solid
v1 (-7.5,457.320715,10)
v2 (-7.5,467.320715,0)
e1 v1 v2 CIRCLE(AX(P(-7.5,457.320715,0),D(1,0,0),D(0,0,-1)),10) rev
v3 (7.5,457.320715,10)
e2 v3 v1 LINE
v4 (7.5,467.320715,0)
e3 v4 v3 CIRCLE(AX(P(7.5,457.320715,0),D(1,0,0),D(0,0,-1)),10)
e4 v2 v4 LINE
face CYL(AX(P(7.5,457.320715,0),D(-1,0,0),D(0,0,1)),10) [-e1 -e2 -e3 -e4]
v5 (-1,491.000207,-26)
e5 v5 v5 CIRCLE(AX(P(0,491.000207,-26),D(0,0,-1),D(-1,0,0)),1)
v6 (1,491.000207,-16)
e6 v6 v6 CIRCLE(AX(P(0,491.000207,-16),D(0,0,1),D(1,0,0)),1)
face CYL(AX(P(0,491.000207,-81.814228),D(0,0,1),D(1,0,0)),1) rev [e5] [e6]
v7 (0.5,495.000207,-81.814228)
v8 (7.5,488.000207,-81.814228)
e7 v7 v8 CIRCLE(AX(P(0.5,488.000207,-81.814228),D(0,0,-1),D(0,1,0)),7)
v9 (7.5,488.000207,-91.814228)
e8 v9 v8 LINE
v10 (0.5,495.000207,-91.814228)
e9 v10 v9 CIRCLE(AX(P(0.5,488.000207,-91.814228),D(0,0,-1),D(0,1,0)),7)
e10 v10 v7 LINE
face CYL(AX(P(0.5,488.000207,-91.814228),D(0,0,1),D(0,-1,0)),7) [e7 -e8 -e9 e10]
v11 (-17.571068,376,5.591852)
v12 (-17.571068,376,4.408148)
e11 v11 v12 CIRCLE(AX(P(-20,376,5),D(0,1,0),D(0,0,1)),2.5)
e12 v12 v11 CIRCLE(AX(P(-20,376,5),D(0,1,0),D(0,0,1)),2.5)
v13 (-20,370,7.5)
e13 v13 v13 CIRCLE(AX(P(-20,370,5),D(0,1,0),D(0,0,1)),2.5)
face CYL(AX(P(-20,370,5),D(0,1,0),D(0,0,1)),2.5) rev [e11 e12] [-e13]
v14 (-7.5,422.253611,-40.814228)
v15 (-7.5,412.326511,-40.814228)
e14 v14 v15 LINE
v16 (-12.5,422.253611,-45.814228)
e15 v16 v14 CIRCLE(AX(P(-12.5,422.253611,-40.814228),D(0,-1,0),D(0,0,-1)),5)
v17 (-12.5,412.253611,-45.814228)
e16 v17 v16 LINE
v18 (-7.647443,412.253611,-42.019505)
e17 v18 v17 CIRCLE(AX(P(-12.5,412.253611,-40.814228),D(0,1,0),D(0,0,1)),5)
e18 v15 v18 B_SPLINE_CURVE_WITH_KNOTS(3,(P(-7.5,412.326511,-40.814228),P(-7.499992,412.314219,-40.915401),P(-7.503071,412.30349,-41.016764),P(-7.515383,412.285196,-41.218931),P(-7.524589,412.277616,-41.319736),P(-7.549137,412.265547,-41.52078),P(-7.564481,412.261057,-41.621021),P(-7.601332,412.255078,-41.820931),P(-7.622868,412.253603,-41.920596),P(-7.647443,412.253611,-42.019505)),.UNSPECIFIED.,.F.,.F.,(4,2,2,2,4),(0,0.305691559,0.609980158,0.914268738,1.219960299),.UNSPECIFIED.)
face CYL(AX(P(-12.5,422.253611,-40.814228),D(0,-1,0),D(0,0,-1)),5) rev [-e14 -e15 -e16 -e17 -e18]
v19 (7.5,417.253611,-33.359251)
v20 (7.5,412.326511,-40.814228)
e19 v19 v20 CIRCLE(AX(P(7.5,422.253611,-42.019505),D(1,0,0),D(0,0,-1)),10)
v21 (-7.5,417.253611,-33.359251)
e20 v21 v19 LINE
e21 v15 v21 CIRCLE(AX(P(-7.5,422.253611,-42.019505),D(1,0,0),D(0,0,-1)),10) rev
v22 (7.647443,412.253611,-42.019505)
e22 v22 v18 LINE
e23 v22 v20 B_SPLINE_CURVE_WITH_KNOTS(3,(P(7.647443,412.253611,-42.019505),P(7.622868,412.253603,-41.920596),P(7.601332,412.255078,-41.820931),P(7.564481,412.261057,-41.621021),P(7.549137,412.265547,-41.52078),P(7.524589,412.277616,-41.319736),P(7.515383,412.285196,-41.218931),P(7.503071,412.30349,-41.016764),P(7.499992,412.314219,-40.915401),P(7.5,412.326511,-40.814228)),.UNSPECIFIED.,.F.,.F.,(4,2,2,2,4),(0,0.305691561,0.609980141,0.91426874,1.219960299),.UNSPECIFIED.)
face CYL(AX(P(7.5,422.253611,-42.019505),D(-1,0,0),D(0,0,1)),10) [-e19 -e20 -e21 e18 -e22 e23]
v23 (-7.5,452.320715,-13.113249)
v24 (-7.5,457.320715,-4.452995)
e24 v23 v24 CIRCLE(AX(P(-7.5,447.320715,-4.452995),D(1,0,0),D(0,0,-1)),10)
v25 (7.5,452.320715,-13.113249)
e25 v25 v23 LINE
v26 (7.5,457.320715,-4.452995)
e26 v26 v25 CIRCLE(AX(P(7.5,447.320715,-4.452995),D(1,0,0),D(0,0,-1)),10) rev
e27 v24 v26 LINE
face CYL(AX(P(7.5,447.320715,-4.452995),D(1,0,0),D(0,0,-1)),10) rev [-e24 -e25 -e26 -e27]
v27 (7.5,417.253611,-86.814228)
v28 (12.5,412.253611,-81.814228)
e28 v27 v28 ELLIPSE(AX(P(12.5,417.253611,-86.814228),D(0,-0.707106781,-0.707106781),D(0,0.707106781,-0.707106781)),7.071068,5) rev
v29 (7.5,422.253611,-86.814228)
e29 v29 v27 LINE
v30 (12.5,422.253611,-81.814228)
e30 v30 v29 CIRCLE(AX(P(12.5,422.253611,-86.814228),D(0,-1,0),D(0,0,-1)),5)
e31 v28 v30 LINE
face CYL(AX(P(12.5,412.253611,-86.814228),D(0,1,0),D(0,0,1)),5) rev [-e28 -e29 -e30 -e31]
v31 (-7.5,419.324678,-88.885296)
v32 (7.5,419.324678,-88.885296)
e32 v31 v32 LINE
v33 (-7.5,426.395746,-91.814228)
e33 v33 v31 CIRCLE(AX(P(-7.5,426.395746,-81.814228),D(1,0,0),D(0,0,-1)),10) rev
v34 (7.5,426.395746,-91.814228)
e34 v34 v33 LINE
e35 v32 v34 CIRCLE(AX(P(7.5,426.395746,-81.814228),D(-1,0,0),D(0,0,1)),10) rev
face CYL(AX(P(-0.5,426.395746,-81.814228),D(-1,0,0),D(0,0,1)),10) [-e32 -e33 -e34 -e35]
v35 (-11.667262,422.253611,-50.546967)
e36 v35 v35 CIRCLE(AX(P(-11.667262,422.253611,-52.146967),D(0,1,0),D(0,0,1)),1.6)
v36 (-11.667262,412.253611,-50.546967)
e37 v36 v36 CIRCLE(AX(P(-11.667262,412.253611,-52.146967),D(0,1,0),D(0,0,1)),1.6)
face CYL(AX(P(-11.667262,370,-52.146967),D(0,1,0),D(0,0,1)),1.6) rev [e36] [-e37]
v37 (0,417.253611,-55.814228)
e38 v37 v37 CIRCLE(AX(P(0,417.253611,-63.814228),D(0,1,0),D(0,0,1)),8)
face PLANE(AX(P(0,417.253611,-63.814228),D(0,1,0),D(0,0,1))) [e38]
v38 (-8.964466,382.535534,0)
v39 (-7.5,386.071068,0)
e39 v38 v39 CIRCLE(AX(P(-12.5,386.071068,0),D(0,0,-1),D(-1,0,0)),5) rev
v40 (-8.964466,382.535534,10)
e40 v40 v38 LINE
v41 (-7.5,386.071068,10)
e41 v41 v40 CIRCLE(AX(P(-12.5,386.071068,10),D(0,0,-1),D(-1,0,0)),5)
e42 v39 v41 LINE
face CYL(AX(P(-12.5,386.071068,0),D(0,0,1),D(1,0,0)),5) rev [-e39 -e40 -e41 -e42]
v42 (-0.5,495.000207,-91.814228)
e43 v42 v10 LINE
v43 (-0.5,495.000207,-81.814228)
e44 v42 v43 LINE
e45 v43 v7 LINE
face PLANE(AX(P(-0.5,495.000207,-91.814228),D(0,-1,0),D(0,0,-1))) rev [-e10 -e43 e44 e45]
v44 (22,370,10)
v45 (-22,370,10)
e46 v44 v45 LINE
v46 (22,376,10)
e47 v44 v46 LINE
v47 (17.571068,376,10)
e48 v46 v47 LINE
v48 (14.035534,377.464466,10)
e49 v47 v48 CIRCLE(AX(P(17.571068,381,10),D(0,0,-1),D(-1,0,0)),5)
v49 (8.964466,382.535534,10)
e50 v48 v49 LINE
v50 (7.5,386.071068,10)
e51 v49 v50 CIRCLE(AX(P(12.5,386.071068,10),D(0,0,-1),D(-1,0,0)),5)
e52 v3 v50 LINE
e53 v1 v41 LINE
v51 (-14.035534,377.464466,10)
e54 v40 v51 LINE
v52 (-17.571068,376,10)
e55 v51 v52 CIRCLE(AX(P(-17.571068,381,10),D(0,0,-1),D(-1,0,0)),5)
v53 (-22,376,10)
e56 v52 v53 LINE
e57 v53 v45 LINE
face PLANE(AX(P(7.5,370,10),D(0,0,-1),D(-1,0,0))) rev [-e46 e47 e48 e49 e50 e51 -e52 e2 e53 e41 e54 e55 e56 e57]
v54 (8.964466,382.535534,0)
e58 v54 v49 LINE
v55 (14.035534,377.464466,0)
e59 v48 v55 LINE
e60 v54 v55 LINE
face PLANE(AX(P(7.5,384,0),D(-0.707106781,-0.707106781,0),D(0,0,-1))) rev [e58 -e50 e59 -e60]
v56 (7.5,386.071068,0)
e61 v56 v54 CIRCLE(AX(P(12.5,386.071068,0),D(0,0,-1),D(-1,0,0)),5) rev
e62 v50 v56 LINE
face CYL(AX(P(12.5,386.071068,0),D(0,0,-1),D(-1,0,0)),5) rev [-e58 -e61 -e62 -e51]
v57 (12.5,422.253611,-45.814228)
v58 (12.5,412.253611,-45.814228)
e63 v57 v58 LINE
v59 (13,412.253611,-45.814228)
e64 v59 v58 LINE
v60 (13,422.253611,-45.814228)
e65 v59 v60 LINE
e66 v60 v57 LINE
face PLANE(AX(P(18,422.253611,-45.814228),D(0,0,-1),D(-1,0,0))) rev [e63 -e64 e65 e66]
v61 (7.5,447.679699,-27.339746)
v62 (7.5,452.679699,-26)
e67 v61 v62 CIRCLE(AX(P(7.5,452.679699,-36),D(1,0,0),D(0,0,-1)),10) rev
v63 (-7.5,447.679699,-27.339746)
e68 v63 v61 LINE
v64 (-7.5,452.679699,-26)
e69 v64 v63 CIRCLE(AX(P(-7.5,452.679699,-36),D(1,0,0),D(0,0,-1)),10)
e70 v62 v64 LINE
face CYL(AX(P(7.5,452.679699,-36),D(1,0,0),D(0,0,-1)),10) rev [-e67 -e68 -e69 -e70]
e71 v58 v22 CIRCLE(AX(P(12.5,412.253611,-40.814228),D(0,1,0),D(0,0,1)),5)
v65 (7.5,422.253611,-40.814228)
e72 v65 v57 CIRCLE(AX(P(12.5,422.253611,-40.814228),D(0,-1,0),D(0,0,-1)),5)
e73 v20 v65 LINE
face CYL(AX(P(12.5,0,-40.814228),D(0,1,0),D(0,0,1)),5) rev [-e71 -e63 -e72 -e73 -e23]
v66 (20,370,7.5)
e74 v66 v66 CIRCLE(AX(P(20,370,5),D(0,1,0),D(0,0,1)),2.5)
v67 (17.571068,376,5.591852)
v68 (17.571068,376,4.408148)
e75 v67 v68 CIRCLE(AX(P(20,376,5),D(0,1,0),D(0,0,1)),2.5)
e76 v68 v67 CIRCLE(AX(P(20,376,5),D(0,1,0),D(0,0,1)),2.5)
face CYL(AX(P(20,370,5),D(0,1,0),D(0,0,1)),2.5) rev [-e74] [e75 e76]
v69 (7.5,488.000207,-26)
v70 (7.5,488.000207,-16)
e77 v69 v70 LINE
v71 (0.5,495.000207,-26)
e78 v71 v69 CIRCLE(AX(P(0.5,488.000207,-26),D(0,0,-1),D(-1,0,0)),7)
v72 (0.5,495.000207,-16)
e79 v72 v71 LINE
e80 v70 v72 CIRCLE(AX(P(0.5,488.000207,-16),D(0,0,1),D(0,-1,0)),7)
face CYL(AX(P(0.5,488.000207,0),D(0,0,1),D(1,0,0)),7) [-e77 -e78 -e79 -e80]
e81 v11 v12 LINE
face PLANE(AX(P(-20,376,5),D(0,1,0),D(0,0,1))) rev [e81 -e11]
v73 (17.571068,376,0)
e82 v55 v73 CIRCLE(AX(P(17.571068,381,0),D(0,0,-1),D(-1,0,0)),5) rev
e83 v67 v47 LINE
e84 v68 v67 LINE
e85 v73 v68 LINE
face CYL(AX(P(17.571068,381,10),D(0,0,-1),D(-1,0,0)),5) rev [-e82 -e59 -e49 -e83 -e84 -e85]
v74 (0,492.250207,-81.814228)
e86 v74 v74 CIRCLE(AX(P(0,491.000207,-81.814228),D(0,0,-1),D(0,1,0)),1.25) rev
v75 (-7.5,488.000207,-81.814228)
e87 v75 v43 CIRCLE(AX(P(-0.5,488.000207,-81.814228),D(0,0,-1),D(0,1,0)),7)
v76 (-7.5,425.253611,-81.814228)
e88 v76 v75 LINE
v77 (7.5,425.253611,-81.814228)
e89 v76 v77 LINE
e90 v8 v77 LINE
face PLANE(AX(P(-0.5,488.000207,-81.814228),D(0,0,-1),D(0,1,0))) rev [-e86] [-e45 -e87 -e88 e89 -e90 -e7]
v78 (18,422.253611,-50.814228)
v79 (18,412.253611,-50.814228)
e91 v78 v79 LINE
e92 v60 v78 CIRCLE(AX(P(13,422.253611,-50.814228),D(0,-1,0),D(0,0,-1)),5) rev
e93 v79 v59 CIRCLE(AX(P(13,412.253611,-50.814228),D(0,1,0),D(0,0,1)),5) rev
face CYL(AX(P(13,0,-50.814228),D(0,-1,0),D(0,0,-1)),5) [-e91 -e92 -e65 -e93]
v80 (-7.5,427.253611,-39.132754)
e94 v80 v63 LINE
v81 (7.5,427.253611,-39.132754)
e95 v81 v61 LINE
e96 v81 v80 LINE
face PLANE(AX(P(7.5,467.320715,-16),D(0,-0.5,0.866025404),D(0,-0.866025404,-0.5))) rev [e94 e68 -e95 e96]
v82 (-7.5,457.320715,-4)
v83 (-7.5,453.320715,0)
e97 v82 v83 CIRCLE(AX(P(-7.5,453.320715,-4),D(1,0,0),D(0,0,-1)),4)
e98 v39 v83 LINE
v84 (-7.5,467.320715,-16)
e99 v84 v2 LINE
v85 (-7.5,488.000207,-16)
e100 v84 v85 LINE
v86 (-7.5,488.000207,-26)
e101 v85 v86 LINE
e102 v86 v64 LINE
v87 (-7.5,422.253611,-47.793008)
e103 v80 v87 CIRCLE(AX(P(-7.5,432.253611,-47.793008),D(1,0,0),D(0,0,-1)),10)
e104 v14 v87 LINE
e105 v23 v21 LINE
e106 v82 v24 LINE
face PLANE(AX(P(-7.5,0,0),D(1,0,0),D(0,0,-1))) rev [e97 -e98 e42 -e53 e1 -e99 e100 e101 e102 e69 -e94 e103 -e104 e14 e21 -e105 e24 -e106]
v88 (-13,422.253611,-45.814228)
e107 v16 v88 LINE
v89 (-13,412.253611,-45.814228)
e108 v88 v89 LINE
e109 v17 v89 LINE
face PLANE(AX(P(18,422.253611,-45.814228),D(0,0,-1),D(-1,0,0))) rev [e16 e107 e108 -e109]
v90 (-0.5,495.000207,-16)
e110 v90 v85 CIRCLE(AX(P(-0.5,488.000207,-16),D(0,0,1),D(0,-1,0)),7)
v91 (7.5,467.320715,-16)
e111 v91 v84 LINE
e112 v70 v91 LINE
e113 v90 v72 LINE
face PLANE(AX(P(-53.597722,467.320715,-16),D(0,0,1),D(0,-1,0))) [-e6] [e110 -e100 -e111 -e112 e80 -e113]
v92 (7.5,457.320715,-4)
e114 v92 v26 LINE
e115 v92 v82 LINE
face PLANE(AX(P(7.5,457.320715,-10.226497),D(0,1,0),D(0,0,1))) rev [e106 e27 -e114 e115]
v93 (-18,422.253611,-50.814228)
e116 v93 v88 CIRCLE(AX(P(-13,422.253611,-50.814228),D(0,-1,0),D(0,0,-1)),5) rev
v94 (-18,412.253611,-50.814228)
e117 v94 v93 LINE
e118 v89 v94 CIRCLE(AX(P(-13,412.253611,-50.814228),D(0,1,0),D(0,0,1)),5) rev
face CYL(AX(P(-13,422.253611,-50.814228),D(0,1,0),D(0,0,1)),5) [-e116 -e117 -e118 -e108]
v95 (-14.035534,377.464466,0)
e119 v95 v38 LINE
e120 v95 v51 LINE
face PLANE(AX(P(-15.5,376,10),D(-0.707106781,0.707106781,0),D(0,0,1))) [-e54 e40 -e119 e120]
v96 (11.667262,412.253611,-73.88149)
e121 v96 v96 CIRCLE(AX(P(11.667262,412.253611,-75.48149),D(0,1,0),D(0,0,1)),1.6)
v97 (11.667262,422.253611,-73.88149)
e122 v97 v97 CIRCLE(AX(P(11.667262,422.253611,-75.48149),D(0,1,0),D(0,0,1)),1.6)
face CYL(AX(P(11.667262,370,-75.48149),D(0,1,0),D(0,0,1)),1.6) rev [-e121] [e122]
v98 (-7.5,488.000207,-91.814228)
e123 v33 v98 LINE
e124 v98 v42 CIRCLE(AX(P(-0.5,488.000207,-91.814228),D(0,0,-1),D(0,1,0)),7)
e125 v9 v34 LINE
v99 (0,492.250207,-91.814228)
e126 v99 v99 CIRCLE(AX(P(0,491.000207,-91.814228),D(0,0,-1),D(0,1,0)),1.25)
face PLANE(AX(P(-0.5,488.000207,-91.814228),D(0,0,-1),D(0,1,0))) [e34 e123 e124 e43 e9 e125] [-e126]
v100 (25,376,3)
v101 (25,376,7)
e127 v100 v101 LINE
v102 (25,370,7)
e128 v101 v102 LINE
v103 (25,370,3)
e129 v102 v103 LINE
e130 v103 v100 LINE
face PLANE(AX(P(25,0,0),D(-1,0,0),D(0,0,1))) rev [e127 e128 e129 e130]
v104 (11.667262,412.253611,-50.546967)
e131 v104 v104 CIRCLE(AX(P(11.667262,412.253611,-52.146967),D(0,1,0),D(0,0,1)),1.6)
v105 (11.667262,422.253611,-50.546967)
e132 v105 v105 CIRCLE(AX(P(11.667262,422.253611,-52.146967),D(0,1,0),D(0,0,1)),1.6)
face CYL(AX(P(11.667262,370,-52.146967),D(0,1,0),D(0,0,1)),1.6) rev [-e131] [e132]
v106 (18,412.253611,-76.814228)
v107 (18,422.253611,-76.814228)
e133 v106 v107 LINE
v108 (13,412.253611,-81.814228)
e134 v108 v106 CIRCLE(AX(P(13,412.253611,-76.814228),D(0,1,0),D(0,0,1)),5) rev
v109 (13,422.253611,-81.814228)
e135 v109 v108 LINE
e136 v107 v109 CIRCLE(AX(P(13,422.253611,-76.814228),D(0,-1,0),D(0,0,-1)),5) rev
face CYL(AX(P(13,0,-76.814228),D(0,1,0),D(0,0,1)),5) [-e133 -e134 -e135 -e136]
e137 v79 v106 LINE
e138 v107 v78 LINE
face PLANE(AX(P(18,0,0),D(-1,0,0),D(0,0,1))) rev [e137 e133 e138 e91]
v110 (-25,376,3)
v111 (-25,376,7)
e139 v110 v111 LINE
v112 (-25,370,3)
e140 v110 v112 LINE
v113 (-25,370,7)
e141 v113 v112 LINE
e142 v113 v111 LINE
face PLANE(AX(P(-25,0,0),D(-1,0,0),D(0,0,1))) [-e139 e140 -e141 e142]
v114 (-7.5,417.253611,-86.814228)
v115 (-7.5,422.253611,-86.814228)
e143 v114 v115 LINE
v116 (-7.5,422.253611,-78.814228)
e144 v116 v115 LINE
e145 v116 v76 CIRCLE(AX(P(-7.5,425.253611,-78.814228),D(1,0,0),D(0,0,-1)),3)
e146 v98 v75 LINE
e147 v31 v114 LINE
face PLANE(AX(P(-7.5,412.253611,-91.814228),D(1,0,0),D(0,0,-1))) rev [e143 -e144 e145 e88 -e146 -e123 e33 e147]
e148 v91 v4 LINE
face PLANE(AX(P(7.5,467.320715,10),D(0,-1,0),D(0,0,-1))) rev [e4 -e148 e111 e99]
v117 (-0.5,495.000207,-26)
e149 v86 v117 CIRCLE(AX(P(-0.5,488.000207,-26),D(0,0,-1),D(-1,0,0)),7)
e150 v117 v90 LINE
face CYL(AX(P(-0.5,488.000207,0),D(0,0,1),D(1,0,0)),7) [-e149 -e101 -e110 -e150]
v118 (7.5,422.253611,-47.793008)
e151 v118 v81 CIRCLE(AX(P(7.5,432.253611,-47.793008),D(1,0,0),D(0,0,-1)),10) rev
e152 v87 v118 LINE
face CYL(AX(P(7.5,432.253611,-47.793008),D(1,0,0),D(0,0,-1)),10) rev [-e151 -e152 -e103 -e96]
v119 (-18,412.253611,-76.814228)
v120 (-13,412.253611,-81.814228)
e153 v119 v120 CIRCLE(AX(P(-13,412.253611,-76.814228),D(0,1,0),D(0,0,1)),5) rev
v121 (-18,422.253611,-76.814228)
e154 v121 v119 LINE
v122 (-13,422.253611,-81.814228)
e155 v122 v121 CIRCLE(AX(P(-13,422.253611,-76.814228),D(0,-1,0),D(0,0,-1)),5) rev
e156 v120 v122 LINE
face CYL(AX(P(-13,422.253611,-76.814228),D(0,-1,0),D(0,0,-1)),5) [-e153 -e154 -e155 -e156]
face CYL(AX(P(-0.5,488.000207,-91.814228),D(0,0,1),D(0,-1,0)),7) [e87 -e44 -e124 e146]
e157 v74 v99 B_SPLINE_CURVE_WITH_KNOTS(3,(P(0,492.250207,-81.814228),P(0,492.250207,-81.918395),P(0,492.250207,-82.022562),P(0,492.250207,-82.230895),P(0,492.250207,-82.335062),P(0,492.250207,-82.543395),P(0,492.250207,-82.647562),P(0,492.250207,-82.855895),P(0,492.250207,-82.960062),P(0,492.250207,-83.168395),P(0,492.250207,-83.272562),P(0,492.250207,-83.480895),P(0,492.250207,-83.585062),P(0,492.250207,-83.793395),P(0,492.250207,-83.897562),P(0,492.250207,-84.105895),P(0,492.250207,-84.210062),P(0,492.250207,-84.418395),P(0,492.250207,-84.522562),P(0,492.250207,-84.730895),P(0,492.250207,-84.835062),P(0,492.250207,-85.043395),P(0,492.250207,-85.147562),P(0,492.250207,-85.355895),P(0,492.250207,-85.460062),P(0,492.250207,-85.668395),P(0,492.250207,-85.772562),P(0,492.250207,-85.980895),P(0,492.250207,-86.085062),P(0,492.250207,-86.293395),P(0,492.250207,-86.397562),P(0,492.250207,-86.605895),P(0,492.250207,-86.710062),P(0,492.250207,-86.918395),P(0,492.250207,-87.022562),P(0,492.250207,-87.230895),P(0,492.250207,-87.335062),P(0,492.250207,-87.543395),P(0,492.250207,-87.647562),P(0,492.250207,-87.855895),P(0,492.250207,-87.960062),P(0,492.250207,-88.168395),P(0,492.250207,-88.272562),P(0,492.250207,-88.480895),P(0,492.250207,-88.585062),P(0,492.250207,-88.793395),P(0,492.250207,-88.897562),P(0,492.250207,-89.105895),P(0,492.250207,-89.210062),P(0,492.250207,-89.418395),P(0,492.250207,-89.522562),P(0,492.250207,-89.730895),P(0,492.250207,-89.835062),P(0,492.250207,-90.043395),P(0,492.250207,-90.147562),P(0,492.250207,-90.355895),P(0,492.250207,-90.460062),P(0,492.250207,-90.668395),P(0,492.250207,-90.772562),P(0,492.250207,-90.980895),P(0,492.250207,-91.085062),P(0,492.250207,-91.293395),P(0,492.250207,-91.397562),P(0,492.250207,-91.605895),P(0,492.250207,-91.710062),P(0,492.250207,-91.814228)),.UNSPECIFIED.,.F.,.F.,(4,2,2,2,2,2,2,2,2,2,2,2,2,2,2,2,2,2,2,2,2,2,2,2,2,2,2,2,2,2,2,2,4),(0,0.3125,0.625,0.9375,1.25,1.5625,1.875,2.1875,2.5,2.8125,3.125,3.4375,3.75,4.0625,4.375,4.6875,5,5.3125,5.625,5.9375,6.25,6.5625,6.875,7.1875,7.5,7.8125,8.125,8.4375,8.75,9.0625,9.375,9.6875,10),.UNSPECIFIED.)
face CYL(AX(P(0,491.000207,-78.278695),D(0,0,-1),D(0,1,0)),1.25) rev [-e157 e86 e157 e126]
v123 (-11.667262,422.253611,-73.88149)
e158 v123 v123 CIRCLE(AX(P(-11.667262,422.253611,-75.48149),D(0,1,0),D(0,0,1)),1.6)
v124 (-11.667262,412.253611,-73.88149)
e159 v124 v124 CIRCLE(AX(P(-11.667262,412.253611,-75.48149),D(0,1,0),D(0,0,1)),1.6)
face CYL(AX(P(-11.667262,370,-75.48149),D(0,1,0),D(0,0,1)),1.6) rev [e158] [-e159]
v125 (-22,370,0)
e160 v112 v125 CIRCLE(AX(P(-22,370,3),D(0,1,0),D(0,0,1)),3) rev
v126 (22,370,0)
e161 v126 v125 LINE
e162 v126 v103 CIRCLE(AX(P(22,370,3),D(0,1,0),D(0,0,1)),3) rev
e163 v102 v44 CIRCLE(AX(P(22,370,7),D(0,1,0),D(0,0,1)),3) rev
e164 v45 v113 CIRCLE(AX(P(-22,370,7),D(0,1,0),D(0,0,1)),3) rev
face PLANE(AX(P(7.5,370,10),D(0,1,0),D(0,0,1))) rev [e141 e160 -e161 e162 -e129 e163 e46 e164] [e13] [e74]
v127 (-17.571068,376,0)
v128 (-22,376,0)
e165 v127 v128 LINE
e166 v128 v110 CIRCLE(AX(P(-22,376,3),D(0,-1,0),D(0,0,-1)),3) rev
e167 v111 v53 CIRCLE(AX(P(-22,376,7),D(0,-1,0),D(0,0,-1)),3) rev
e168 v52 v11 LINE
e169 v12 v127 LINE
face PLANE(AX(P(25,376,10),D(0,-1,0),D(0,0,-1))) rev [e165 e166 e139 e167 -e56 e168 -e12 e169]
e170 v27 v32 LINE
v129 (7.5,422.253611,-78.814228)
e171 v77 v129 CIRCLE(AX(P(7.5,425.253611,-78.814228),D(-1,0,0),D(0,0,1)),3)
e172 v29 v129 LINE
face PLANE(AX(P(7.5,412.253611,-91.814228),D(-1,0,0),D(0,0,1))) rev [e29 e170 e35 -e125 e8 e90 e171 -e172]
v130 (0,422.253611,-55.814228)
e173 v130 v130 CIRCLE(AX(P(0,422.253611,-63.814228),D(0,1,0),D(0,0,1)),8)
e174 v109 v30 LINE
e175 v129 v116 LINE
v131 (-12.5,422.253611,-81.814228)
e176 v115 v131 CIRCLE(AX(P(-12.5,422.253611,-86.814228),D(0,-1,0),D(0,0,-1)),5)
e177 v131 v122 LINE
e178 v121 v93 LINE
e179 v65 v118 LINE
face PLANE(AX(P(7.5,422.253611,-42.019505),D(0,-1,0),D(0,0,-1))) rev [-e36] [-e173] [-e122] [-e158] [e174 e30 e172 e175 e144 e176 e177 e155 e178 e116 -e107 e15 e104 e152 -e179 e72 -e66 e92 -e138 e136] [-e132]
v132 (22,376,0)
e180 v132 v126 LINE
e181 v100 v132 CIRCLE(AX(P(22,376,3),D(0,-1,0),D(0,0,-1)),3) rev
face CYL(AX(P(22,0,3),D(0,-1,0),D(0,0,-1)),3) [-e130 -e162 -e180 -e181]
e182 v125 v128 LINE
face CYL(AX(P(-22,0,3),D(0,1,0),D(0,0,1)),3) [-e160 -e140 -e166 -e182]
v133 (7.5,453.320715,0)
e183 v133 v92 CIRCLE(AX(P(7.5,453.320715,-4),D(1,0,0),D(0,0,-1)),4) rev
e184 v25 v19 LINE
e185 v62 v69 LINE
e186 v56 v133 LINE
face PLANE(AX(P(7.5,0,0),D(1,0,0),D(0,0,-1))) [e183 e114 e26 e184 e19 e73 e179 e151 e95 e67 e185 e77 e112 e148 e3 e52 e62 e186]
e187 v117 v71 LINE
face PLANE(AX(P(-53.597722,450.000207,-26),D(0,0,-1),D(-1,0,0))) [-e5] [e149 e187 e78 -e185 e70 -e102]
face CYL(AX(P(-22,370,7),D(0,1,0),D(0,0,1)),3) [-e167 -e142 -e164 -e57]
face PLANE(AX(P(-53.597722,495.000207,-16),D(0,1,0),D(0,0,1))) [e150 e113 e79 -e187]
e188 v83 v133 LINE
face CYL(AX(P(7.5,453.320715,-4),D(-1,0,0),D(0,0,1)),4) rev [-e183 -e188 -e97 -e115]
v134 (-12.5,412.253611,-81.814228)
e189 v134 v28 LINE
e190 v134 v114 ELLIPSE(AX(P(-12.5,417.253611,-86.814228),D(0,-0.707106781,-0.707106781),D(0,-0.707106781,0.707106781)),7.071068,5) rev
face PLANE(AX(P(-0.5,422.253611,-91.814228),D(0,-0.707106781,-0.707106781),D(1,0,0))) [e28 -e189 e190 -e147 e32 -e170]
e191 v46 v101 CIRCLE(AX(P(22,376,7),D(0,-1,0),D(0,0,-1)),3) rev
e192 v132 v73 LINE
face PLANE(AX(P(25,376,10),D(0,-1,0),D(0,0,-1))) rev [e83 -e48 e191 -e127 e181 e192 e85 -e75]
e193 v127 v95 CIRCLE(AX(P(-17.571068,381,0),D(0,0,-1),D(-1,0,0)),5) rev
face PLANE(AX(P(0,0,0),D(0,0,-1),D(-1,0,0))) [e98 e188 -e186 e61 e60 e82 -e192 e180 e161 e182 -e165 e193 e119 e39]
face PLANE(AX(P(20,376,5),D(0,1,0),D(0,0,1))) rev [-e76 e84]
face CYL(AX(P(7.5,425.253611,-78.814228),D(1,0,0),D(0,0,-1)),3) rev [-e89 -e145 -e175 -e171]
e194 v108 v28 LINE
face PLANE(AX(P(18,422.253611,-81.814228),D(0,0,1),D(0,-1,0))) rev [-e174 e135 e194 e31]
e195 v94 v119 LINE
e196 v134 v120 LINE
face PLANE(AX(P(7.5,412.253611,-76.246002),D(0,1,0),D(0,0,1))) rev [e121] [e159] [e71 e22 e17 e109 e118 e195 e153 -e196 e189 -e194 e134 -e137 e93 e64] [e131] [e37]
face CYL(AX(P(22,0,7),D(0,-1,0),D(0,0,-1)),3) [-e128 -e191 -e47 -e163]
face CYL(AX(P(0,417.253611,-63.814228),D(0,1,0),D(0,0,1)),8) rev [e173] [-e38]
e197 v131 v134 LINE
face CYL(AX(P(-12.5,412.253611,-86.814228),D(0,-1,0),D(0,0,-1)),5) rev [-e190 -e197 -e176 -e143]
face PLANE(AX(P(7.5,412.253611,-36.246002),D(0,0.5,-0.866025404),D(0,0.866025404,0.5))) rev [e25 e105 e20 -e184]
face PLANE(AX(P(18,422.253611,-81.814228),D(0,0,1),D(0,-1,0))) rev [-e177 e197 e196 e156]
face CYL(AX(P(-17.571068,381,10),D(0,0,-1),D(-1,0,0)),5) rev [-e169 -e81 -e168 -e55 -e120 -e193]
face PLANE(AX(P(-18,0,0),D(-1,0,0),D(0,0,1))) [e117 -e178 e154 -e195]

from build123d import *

# Parameters (mm, degrees)
SKETCH1_W           = 40
SKETCH1_H           = 50
BOSS_EXTRUDE1_DEPTH = 5
BOSS_EXTRUDE2_DEPTH = 7.5
FILLET3_R           = 10
SKETCH6_W           = 36
SKETCH6_H           = 10
BOSS_EXTRUDE3_DEPTH = 18
SKETCH7_R           = 8
CUT_EXTRUDE3_DEPTH  = 5
FILLET5_R           = 5
SKETCH8_R           = 1.6
CUT_EXTRUDE4_DEPTH  = 100.116132934
FILLET6_R           = 3
BOSS_EXTRUDE4_DEPTH = 15
SKETCH10_R          = 1
CUT_EXTRUDE5_DEPTH  = 500.756658462
FILLET8_R           = 10
FILLET9_R           = 7
CUT_EXTRUDE7_DEPTH  = 5
FILLET10_R          = 4
SKETCH13_W          = 10
SKETCH13_H          = 6
BOSS_EXTRUDE5_DEPTH = 25
CHAMFER1_SIZE       = 8
FILLET11_R          = 5
FILLET12_R          = 3
BOSS_EXTRUDE7_DEPTH = 10
CHAMFER2_SIZE       = 10
FILLET15_R          = 10
FILLET16_R          = 3
FILLET17_R          = 5
SKETCH19_R          = 1.25
CUT_EXTRUDE8_DEPTH  = 10
SKETCH20_R          = 2.5
CUT_EXTRUDE9_DEPTH  = 153.367653519


with BuildPart() as part:
    # Sketch1 → Boss-Extrude1 (new body)
    with BuildSketch(Plane.XY):
        with Locations((0, 421.657979857)):
            Rectangle(SKETCH1_W, SKETCH1_H)
    extrude(amount=BOSS_EXTRUDE1_DEPTH)

    # Sketch5 → Boss-Extrude2 (add, symmetric)
    with BuildSketch(Plane(origin=(0, 0, 0), x_dir=(0, 0, -1), z_dir=(1, 0, 0))):
        Polygon((-10, 370), (-10, 467.320715151), (16, 467.320715151), (42.019504932, 422.253610621), (76.24600224, 422.253610621), (76.24600224, 412.253610621), (36.24600224, 412.253610621), (10.226497308, 457.320715151), (0, 457.320715151), (0, 370), align=None)
    extrude(amount=BOSS_EXTRUDE2_DEPTH, both=True)

    # Fillet3
    fillet3_edges = [part.edges().sort_by_distance(p)[0] for p in [
        (0, 457.320715151, -10.226497308),
        (0, 412.253610621, -36.24600224),
        (0, 422.253610621, -42.019504932),
        (0, 467.320715151, 10),
    ]]
    fillet(fillet3_edges, radius=FILLET3_R)

    # Sketch6 → Boss-Extrude3 (add, symmetric)
    with BuildSketch(Plane(origin=(0, 0, 0), x_dir=(0, 0, -1), z_dir=(1, 0, 0))):
        with Locations((63.814228499, 417.253610621)):
            Rectangle(SKETCH6_W, SKETCH6_H)
    extrude(amount=BOSS_EXTRUDE3_DEPTH, both=True)

    # Sketch7 → Cut-Extrude3 (cut)
    with BuildSketch(Plane(origin=(0, 422.253610621, 0), x_dir=(1, 0, 0), z_dir=(0, 1, 0))):
        with Locations(Location((0, 63.814228499, 0), (0, 0, 270))):
            Circle(SKETCH7_R)
    extrude(amount=-CUT_EXTRUDE3_DEPTH, mode=Mode.SUBTRACT)

    # Fillet5
    fillet5_edges = [part.edges().sort_by_distance(p)[0] for p in [
        (-7.5, 417.253610621, -45.814228499),
    ]]
    fillet(fillet5_edges, radius=FILLET5_R)
    fillet5_2_edges = [part.edges().sort_by_distance(p)[0] for p in [
        (-18, 417.253610621, -45.814228499),
    ]]
    fillet(fillet5_2_edges, radius=FILLET5_R)
    fillet5_3_edges = [part.edges().sort_by_distance(p)[0] for p in [
        (7.5, 417.253610621, -45.814228499),
    ]]
    fillet(fillet5_3_edges, radius=FILLET5_R)
    fillet5_4_edges = [part.edges().sort_by_distance(p)[0] for p in [
        (18, 417.253610621, -45.814228499),
    ]]
    fillet(fillet5_4_edges, radius=FILLET5_R)
    fillet5_5_edges = [part.edges().sort_by_distance(p)[0] for p in [
        (18, 417.253610621, -81.814228499),
    ]]
    fillet(fillet5_5_edges, radius=FILLET5_R)
    fillet5_6_edges = [part.edges().sort_by_distance(p)[0] for p in [
        (-18, 417.253610621, -81.814228499),
    ]]
    fillet(fillet5_6_edges, radius=FILLET5_R)

    # Sketch8 → Cut-Extrude4 (cut, through all)
    with BuildSketch(Plane(origin=(0, 422.253610621, 0), x_dir=(1, 0, 0), z_dir=(0, 1, 0))):
        with Locations(Location((11.66726189, 52.14696661, 0), (0, 0, 270))):
            Circle(SKETCH8_R)
        with Locations(Location((-11.66726189, 52.14696661, 0), (0, 0, 270))):
            Circle(SKETCH8_R)
        with Locations(Location((-11.66726189, 75.481490389, 0), (0, 0, 270))):
            Circle(SKETCH8_R)
        with Locations(Location((11.66726189, 75.481490389, 0), (0, 0, 270))):
            Circle(SKETCH8_R)
    extrude(amount=-CUT_EXTRUDE4_DEPTH, mode=Mode.SUBTRACT)

    # Fillet6
    fillet6_edges = [part.edges().sort_by_distance(p)[0] for p in [
        (-20, 446.657979857, 2.5),
        (20, 446.657979857, 2.5),
        (20, 396.657979857, 2.5),
        (-20, 396.657979857, 2.5),
    ]]
    fillet(fillet6_edges, radius=FILLET6_R)

    # Sketch9 → Boss-Extrude4 (add)
    with BuildSketch(Plane(origin=(7.5, 0, 0), x_dir=(0, 0, -1), z_dir=(1, 0, 0))):
        Polygon((26, 450.000207075), (26, 495.000207075), (16, 495.000207075), (16, 467.320715151), align=None)
    extrude(amount=-BOSS_EXTRUDE4_DEPTH)

    # Sketch10 → Cut-Extrude5 (cut, through all)
    with BuildSketch(Plane.XY.offset(-16)):
        with Locations((0, 491.000207075)):
            Circle(SKETCH10_R)
    extrude(amount=-CUT_EXTRUDE5_DEPTH, mode=Mode.SUBTRACT)

    # Fillet8
    fillet8_edges = [part.edges().sort_by_distance(p)[0] for p in [
        (0, 450.000207075, -26),
    ]]
    fillet(fillet8_edges, radius=FILLET8_R)

    # Fillet9
    fillet9_edges = [part.edges().sort_by_distance(p)[0] for p in [
        (7.5, 495.000207075, -21),
        (-7.5, 495.000207075, -21),
    ]]
    fillet(fillet9_edges, radius=FILLET9_R)

    # Sketch12 → Cut-Extrude7 (cut)
    with BuildSketch(Plane.XY.offset(5)):
        with BuildLine():
            Line((7.5, 396.657979857), (17, 396.657979857))
            ThreePointArc((17, 396.657979857), (19.121320344, 397.536659513), (20, 399.657979857))
            Line((20, 399.657979857), (20, 443.657979857))
            ThreePointArc((20, 443.657979857), (19.121320344, 445.7793002), (17, 446.657979857))
            Line((17, 446.657979857), (7.5, 446.657979857))
            Line((7.5, 446.657979857), (7.5, 396.657979857))
        make_face()
        with BuildLine():
            Line((-20, 443.657979857), (-20, 399.657979857))
            ThreePointArc((-20, 399.657979857), (-19.121320344, 397.536659513), (-17, 396.657979857))
            Line((-17, 396.657979857), (-7.5, 396.657979857))
            Line((-7.5, 396.657979857), (-7.5, 446.657979857))
            Line((-7.5, 446.657979857), (-17, 446.657979857))
            ThreePointArc((-17, 446.657979857), (-19.121320344, 445.7793002), (-20, 443.657979857))
        make_face()
    extrude(amount=-CUT_EXTRUDE7_DEPTH, mode=Mode.SUBTRACT)

    # Fillet10
    fillet10_edges = [part.edges().sort_by_distance(p)[0] for p in [
        (0, 457.320715151, 0),
    ]]
    fillet(fillet10_edges, radius=FILLET10_R)

    # Sketch13 → Boss-Extrude5 (add, symmetric)
    with BuildSketch(Plane(origin=(0, 0, 0), x_dir=(0, 0, -1), z_dir=(1, 0, 0))):
        with Locations((-5, 373)):
            Rectangle(SKETCH13_W, SKETCH13_H)
    extrude(amount=BOSS_EXTRUDE5_DEPTH, both=True)

    # Chamfer1
    chamfer1_edges = [part.edges().sort_by_distance(p)[0] for p in [
        (7.5, 376, 5),
        (-7.5, 376, 5),
    ]]
    chamfer(chamfer1_edges, length=CHAMFER1_SIZE)

    # Fillet11
    fillet11_edges = [part.edges().sort_by_distance(p)[0] for p in [
        (-15.5, 376, 5),
        (-7.5, 384, 5),
        (7.5, 384, 5),
        (15.5, 376, 5),
    ]]
    fillet(fillet11_edges, radius=FILLET11_R)

    # Fillet12
    fillet12_edges = [part.edges().sort_by_distance(p)[0] for p in [
        (-25, 373, 10),
        (-25, 373, 0),
        (25, 373, 10),
        (25, 373, 0),
    ]]
    fillet(fillet12_edges, radius=FILLET12_R)

    # Sketch18 → Boss-Extrude7 (add)
    with BuildSketch(Plane(origin=(0, 0, -81.814228499), x_dir=(-1, 0, 0), z_dir=(0, 0, -1))):
        with BuildLine():
            Line((7.5, 412.253610621), (7.5, 488.000207075))
            ThreePointArc((7.5, 488.000207075), (5.449747468, 492.949954543), (0.5, 495.000207075))
            Line((0.5, 495.000207075), (-0.5, 495.000207075))
            ThreePointArc((-0.5, 495.000207075), (-5.449747468, 492.949954543), (-7.5, 488.000207075))
            Line((-7.5, 488.000207075), (-7.5, 412.253610621))
            Line((-7.5, 412.253610621), (7.5, 412.253610621))
        make_face()
    extrude(amount=BOSS_EXTRUDE7_DEPTH)

    # Chamfer2
    chamfer2_edges = [part.edges().sort_by_distance(p)[0] for p in [
        (0, 412.253610621, -91.814228499),
    ]]
    chamfer(chamfer2_edges, length=CHAMFER2_SIZE)

    # Fillet15
    fillet15_edges = [part.edges().sort_by_distance(p)[0] for p in [
        (0, 422.253610621, -91.814228499),
    ]]
    fillet(fillet15_edges, radius=FILLET15_R)

    # Fillet16
    fillet16_edges = [part.edges().sort_by_distance(p)[0] for p in [
        (0, 422.253610621, -81.814228499),
    ]]
    fillet(fillet16_edges, radius=FILLET16_R)

    # Fillet17
    fillet17_edges = [part.edges().sort_by_distance(p)[0] for p in [
        (7.5, 417.253610621, -81.814228499),
        (-7.5, 417.253610621, -81.814228499),
    ]]
    fillet(fillet17_edges, radius=FILLET17_R)

    # Sketch19 → Cut-Extrude8 (cut)
    with BuildSketch(Plane(origin=(0, 0, -91.814228499), x_dir=(-1, 0, 0), z_dir=(0, 0, -1))):
        with Locations(Location((0, 491.000207075, 0), (0, 0, 90))):
            Circle(SKETCH19_R)
    extrude(amount=-CUT_EXTRUDE8_DEPTH, mode=Mode.SUBTRACT)

    # Sketch20 → Cut-Extrude9 (cut, through all)
    with BuildSketch(Plane(origin=(0, 376, 0), x_dir=(1, 0, 0), z_dir=(0, 1, 0))):
        with Locations(Location((-20, -5, 0), (0, 0, 270))):
            Circle(SKETCH20_R)
        with Locations(Location((20, -5, 0), (0, 0, 270))):
            Circle(SKETCH20_R)
    extrude(amount=-CUT_EXTRUDE9_DEPTH, mode=Mode.SUBTRACT)


solid = part.part
